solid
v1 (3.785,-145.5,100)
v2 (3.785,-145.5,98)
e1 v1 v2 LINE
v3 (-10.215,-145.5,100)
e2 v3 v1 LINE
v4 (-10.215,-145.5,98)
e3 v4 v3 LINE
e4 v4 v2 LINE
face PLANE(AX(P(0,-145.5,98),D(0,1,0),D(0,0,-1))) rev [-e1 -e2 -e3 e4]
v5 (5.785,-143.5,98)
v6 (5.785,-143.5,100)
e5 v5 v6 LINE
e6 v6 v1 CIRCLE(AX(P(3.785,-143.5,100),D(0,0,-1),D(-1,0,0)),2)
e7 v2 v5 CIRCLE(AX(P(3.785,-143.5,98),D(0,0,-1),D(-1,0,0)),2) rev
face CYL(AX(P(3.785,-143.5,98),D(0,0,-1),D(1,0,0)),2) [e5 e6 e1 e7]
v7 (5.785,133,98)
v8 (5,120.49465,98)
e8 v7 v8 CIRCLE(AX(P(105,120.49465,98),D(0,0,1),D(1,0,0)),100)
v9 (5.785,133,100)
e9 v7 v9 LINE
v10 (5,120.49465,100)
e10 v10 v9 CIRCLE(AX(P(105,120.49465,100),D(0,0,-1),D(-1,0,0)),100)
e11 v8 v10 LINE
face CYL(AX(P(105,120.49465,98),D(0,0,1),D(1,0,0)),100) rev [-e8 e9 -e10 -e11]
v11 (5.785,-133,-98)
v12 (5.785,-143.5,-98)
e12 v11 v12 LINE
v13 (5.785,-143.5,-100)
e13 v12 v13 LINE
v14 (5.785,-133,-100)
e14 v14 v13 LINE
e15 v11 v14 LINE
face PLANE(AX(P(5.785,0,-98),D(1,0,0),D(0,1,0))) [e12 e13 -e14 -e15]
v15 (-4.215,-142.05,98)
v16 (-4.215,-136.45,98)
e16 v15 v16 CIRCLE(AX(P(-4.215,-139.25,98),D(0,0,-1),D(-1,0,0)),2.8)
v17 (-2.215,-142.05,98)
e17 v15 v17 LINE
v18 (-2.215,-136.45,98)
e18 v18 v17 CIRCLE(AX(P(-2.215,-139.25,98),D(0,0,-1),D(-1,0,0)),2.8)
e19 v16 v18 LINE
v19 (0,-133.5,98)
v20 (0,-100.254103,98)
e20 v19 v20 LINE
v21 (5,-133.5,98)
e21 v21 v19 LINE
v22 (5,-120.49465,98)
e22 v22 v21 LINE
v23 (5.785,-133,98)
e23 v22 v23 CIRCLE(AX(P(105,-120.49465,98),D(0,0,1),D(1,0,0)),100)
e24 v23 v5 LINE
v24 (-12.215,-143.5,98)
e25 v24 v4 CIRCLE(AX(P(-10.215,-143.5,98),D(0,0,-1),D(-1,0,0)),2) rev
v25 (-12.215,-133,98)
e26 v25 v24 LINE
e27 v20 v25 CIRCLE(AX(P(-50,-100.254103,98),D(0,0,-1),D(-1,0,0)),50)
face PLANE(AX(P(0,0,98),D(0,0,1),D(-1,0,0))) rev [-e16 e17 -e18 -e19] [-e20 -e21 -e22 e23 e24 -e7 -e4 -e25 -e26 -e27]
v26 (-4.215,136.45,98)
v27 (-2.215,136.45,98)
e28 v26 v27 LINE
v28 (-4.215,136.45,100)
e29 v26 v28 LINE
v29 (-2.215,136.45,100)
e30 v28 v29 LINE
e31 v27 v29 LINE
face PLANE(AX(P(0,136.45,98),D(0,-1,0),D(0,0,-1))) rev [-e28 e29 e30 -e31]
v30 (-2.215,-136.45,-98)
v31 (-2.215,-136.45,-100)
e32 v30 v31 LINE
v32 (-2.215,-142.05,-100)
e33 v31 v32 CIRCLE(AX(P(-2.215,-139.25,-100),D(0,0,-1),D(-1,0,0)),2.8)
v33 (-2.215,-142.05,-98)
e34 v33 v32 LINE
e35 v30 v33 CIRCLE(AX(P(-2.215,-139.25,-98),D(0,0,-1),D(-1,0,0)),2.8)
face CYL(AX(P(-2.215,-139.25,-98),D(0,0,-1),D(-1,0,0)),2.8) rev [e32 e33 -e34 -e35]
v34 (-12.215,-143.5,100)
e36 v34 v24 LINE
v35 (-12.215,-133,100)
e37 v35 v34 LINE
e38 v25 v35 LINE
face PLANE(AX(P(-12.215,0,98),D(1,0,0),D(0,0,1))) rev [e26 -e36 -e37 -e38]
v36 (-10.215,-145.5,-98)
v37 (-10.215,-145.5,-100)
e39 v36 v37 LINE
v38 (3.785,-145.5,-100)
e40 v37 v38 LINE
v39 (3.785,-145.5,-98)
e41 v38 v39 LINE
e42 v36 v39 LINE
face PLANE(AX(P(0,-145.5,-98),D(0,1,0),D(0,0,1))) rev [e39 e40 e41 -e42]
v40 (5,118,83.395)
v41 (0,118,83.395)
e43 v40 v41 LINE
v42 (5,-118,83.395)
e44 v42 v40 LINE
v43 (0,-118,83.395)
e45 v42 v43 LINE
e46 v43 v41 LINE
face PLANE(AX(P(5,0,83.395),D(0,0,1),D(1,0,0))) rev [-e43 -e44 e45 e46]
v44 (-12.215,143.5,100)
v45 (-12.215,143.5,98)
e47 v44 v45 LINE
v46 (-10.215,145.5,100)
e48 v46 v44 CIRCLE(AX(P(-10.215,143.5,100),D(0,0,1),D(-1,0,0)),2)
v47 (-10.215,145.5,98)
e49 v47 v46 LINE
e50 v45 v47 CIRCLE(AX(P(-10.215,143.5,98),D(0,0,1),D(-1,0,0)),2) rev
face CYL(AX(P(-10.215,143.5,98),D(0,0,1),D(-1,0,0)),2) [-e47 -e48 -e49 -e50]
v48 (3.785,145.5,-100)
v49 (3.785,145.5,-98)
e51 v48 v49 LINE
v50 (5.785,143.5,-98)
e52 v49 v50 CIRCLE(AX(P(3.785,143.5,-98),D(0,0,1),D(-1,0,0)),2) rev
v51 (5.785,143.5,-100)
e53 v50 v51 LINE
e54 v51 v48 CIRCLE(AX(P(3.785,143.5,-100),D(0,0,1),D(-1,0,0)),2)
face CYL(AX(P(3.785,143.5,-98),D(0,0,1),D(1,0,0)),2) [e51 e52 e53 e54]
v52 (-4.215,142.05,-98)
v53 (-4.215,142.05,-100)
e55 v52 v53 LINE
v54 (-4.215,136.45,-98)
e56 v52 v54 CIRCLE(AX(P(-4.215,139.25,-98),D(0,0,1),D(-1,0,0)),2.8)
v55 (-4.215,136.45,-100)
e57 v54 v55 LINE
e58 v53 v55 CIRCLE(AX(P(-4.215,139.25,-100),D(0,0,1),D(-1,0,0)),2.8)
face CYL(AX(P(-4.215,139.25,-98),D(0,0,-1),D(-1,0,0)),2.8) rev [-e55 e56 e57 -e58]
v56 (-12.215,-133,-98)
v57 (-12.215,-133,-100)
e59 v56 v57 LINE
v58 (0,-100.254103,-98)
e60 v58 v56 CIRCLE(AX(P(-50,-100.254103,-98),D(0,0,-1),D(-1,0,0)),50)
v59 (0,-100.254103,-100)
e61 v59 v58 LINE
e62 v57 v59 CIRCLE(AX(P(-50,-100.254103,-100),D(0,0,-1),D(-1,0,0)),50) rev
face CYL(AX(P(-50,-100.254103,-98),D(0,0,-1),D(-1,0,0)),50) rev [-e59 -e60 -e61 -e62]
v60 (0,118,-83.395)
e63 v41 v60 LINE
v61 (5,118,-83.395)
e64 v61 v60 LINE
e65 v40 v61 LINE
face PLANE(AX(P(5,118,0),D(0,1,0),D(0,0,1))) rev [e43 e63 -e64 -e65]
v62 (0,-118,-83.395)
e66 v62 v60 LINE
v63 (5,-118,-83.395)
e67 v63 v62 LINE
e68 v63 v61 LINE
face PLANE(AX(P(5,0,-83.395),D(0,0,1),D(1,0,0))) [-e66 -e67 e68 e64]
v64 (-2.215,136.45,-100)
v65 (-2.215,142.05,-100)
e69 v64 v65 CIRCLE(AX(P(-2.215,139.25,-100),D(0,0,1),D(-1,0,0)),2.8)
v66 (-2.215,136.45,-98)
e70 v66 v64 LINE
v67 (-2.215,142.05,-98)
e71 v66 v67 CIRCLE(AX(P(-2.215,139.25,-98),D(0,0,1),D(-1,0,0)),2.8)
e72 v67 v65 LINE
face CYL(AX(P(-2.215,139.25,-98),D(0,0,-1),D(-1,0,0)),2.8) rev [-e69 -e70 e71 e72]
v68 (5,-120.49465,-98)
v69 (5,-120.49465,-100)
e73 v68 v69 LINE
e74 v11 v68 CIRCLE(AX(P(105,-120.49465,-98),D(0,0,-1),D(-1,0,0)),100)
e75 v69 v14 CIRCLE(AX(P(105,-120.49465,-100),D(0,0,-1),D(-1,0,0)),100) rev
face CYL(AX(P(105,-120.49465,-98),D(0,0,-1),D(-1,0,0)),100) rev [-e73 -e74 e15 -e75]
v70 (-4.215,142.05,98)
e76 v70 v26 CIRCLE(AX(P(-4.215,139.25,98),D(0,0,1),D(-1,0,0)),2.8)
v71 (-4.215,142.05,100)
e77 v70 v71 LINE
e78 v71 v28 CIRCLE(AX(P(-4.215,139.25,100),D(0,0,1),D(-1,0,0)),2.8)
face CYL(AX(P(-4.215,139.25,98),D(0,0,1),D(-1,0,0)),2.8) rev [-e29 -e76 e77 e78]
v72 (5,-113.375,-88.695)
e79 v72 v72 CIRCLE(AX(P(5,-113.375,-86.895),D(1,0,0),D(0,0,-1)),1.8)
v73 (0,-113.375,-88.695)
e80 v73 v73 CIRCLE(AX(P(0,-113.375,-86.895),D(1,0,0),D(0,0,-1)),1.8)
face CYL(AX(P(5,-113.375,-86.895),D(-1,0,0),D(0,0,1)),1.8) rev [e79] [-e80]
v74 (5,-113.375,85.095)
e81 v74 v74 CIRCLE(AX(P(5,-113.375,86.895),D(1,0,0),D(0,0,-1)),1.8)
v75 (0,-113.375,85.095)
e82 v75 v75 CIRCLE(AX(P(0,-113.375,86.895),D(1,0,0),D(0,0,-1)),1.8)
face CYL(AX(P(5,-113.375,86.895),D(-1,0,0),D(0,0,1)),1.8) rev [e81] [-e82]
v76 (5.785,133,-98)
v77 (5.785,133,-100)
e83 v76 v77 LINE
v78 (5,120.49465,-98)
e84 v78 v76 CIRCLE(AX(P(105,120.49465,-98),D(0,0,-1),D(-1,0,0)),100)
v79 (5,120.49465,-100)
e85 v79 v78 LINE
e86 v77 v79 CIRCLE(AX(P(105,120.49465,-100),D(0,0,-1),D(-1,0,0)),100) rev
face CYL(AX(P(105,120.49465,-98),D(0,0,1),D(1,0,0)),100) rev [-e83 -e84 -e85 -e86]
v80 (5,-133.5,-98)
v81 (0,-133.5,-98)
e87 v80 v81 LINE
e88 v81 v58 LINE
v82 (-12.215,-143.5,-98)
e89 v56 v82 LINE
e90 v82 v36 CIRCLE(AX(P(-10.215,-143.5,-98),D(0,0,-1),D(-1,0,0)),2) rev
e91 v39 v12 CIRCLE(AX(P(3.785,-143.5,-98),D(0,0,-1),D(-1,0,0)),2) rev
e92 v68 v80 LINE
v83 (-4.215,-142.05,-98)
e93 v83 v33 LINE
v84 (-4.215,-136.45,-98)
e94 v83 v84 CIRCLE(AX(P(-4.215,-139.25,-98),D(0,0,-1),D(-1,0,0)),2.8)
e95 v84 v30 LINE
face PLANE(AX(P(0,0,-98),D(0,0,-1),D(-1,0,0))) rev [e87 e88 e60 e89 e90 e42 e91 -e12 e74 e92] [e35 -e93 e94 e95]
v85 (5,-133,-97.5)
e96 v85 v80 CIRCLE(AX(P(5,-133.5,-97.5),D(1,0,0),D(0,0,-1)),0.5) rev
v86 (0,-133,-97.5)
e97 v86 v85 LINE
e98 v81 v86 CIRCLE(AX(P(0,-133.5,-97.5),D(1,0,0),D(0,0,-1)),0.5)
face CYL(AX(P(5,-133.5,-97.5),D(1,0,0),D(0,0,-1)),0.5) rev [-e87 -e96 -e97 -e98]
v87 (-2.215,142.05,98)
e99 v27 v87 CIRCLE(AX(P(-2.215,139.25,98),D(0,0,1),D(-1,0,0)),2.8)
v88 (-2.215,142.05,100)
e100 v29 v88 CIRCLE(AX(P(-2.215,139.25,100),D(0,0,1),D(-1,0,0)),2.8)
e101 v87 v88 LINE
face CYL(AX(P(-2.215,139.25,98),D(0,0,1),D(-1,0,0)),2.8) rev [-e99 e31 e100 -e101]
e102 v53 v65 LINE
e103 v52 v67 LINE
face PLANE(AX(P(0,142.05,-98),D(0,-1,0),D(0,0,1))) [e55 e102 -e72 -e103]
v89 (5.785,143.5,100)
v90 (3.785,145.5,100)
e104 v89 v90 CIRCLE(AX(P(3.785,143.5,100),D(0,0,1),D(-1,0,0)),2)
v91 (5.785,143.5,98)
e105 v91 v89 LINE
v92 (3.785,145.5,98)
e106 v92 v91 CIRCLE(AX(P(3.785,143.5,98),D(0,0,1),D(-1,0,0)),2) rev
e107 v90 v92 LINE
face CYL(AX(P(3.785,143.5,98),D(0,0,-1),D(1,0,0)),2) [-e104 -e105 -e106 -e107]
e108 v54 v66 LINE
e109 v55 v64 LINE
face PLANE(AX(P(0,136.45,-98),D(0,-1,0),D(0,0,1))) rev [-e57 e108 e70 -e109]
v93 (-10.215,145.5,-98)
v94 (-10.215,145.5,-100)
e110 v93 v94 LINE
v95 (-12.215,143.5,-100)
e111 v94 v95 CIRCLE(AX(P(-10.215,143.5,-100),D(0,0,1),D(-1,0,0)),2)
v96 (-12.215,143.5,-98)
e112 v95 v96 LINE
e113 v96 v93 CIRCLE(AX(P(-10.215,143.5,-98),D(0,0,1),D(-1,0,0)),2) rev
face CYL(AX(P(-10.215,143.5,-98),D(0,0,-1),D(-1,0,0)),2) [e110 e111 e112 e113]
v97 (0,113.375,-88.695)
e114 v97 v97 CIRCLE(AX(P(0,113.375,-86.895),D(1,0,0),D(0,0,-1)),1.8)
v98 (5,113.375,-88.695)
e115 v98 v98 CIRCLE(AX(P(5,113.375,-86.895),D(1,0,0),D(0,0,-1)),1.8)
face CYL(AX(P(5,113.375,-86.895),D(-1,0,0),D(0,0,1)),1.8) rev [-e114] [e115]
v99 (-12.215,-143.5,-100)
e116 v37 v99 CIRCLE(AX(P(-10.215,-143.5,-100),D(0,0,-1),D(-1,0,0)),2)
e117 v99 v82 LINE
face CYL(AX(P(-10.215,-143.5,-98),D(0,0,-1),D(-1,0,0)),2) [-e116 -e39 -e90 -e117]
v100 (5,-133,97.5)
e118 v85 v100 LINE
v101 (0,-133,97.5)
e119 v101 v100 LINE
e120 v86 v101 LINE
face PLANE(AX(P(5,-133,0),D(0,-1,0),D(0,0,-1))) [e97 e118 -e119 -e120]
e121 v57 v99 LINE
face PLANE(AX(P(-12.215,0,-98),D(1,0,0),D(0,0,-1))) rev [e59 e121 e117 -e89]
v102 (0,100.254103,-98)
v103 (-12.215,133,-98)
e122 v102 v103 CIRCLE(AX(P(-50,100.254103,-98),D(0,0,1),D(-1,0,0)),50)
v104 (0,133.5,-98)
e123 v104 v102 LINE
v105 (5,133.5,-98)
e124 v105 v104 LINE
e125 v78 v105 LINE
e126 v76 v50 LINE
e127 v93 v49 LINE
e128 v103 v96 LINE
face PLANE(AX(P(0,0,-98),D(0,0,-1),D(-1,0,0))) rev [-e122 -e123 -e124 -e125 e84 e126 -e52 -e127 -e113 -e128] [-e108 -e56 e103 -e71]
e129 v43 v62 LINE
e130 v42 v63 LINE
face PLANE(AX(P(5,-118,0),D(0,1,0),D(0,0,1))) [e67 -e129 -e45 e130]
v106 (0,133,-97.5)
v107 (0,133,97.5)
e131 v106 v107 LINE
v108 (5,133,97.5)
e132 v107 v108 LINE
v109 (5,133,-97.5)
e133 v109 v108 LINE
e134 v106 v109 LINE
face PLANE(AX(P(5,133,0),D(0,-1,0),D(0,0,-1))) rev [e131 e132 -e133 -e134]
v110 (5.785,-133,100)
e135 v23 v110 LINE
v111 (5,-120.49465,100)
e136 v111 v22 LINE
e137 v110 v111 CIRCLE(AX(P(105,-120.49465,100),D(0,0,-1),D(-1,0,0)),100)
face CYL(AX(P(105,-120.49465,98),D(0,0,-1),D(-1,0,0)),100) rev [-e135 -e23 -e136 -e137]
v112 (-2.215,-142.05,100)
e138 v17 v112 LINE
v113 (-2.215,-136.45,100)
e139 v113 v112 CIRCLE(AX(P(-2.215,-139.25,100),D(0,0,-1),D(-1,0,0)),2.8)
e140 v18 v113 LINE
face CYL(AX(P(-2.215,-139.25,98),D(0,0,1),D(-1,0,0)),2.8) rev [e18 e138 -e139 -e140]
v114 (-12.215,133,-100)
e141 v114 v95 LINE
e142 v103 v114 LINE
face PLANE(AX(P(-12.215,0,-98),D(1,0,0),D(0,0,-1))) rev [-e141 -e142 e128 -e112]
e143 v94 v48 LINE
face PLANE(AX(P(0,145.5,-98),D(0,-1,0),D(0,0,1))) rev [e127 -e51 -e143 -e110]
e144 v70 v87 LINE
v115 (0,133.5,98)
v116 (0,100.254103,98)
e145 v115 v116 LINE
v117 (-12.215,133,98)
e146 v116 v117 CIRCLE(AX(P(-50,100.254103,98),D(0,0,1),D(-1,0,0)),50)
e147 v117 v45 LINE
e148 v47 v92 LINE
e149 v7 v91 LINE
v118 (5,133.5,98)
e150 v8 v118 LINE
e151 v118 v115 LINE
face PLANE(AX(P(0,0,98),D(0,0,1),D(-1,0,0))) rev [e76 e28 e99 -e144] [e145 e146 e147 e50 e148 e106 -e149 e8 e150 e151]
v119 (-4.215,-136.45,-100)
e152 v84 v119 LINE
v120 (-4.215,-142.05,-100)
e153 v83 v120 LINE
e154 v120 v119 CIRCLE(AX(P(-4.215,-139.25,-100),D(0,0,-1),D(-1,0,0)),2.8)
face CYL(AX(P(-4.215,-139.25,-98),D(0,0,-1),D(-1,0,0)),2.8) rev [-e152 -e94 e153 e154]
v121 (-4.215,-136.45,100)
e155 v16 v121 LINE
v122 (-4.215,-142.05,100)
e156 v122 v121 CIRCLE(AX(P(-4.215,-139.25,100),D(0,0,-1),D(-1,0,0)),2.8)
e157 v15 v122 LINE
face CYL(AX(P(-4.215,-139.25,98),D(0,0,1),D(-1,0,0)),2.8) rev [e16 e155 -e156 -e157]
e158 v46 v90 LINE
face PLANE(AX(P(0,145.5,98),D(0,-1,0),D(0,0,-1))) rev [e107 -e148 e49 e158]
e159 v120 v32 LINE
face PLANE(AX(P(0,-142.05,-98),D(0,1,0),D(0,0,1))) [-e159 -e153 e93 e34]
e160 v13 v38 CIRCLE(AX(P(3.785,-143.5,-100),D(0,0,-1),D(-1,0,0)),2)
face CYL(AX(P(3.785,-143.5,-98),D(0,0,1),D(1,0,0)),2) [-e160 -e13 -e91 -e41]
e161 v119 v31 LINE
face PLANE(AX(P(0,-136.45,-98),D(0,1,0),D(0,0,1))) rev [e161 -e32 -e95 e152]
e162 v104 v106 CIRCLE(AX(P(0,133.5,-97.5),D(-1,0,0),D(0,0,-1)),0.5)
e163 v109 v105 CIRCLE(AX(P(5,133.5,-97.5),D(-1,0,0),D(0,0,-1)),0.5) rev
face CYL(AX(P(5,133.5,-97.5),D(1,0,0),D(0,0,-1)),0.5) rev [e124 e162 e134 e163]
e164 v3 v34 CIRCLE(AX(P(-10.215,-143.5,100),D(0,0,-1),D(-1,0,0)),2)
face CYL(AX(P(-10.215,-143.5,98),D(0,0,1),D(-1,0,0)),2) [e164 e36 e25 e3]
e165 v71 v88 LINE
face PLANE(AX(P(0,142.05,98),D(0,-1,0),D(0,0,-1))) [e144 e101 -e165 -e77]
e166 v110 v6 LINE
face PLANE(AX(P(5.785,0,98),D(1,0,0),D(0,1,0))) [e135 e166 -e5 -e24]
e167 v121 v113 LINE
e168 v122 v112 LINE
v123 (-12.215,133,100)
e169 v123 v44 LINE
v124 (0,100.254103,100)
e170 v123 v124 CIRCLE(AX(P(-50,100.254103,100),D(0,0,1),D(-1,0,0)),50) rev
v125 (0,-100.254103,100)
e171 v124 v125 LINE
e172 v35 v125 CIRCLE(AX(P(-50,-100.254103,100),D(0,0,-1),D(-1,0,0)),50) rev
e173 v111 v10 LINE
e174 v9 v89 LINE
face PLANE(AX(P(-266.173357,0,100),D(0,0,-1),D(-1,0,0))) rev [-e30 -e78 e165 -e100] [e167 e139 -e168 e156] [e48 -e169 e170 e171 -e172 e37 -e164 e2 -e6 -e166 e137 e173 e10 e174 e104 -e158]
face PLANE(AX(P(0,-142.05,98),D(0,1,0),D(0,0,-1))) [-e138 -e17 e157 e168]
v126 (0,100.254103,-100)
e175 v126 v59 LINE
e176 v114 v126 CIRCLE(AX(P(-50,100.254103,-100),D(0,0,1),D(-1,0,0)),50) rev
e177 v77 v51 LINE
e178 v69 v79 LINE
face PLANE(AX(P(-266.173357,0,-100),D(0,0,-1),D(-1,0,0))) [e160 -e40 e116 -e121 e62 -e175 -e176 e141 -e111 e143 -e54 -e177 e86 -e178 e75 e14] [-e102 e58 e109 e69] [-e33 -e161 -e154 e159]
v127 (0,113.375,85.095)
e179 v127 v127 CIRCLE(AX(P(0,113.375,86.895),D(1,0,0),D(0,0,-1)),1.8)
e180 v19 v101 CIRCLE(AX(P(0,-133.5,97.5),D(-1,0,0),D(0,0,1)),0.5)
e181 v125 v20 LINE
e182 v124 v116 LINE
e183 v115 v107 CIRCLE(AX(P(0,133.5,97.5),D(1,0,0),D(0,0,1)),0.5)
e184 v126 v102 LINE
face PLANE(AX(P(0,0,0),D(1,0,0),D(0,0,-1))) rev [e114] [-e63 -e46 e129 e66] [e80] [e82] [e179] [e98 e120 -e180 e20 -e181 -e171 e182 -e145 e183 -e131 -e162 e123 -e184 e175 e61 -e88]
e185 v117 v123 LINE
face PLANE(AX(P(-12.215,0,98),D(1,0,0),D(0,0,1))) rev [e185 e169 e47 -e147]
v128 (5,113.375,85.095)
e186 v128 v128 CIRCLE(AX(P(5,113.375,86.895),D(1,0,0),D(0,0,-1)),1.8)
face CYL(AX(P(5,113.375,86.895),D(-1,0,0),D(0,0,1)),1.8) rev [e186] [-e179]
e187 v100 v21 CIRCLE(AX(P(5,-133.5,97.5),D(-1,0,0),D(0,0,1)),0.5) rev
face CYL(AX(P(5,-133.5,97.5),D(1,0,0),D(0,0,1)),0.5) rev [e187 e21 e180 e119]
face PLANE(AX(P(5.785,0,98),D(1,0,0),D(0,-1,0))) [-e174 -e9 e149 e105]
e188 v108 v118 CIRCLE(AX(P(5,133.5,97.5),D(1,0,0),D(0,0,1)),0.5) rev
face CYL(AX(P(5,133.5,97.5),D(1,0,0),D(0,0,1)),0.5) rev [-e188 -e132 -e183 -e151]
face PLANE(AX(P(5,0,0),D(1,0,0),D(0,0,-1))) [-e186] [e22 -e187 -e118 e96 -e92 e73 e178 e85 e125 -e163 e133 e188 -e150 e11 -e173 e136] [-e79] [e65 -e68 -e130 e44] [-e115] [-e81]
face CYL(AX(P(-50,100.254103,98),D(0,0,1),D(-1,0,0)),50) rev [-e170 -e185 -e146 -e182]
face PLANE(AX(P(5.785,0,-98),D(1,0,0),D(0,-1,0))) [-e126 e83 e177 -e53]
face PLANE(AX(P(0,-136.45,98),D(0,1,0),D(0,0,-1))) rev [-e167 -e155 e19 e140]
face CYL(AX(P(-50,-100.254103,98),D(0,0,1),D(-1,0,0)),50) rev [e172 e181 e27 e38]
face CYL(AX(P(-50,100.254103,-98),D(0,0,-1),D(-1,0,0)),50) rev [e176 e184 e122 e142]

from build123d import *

# Parameters (mm, degrees)
SKETCH1_W           = 266
SKETCH1_H           = 7
SKETCH1_R           = 1.8
SKETCH1_W_2         = 15
SKETCH1_H_2         = 166.79
BOSS_EXTRUDE1_DEPTH = 5
SKETCH2_W           = 266
SKETCH2_H           = 9.605
BOSS_EXTRUDE2_DEPTH = 5
SKETCH3_W           = 17.215
SKETCH3_H           = 12.5
SKETCH3_W_2         = 0.785
BOSS_EXTRUDE3_DEPTH = 2
FILLET1_R           = 0.5
FILLET2_R           = 50
FILLET3_R           = 2
FILLET4_R           = 100


with BuildPart() as part:
    # Sketch1 → Boss-Extrude1 (new body)
    # profile 1 of 4: a face of its own
    with BuildSketch(Plane.YZ):
        with Locations((0, 86.895)):
            Rectangle(SKETCH1_W, SKETCH1_H)
        with Locations(Location((113.375, 86.895, 0), (0, 0, 270))):
            Circle(SKETCH1_R, mode=Mode.SUBTRACT)
        with Locations(Location((-113.375, 86.895, 0), (0, 0, 270))):
            Circle(SKETCH1_R, mode=Mode.SUBTRACT)
    # profile 2 of 4: a face of its own
    with BuildSketch(Plane.YZ):
        with Locations((125.5, 0)):
            Rectangle(SKETCH1_W_2, SKETCH1_H_2)
    # profile 3 of 4: a face of its own
    with BuildSketch(Plane.YZ):
        with Locations((-125.5, 0)):
            Rectangle(SKETCH1_W_2, SKETCH1_H_2)
    # profile 4 of 4: a face of its own
    with BuildSketch(Plane.YZ):
        with Locations((0, -86.895)):
            Rectangle(SKETCH1_W, SKETCH1_H)
        with Locations(Location((-113.375, -86.895, 0), (0, 0, 270))):
            Circle(SKETCH1_R, mode=Mode.SUBTRACT)
        with Locations(Location((113.375, -86.895, 0), (0, 0, 270))):
            Circle(SKETCH1_R, mode=Mode.SUBTRACT)
    extrude(amount=BOSS_EXTRUDE1_DEPTH)

    # Sketch2 → Boss-Extrude2 (add)
    with BuildSketch(Plane.YZ.offset(5)):
        with Locations((0, 95.1975)):
            Rectangle(SKETCH2_W, SKETCH2_H)
        with Locations((0, -95.1975)):
            Rectangle(SKETCH2_W, SKETCH2_H)
    extrude(amount=-BOSS_EXTRUDE2_DEPTH)

    # Sketch3 → Boss-Extrude3 (add)
    # profile 1 of 2: a face of its own
    with BuildSketch(Plane(origin=(0, 0, -100), x_dir=(1, 0, 0), z_dir=(0, 0, -1))):
        with Locations((-3.6075, 139.25)):
            Rectangle(SKETCH3_W, SKETCH3_H)
        with BuildLine():
            ThreePointArc((-4.215, 136.45), (-7.015, 139.25), (-4.215, 142.05))
            Line((-4.215, 142.05), (-2.215, 142.05))
            ThreePointArc((-2.215, 142.05), (0.585, 139.25), (-2.215, 136.45))
            Line((-2.215, 136.45), (-4.215, 136.45))
        make_face(mode=Mode.SUBTRACT)
    # profile 2 of 2: a face of its own
    with BuildSketch(Plane(origin=(0, 0, -100), x_dir=(1, 0, 0), z_dir=(0, 0, -1))):
        with Locations((5.3925, 139.25)):
            Rectangle(SKETCH3_W_2, SKETCH3_H)
    extrude(amount=-BOSS_EXTRUDE3_DEPTH)

    # Fillet1
    fillet1_edges = [part.edges().sort_by_distance(p)[0] for p in [
        (2.5, -133, -98),
    ]]
    fillet(fillet1_edges, radius=FILLET1_R)

    # Fillet2
    # the kernel refuses this fillet: 50 mm, written as the material it adds along each edge
    with BuildSketch(Plane(origin=(0, -133, -100), x_dir=(0, 1, 0), z_dir=(0, 0, 1))) as fillet2_piece_1:
        with BuildLine():
            CenterArc((32.745897071, 50), FILLET2_R, 229.086571868, 40.913428132)
            Line((0, 12.215), (0, 0))
            Line((0, 0), (32.745897071, 0))
        make_face()
    extrude(amount=2)

    # Fillet3
    fillet3_edges = [part.edges().sort_by_distance(p)[0] for p in [
        (-12.215, -145.5, -99),
        (5.785, -145.5, -99),
    ]]
    fillet(fillet3_edges, radius=FILLET3_R)

    # Mirror1: part across plane


with BuildPart() as part_1:
    add(part.part)
    add(part.part.mirror(Plane.XY))

    # Mirror2: part across plane


with BuildPart() as part_2:
    add(part_1.part)
    add(part_1.part.mirror(Plane.ZX))

    # Fillet4
    # the kernel refuses this fillet: 100 mm, written as the material it adds along each edge
    with BuildSketch(Plane(origin=(5, 133, 98), x_dir=(1, 0, 0), z_dir=(0, 0, 1)), Plane(origin=(5, 133, -100), x_dir=(1, 0, 0), z_dir=(0, 0, 1)), Plane(origin=(5, -133, -98), x_dir=(1, 0, 0), z_dir=(0, 0, -1)), Plane(origin=(5, -133, 100), x_dir=(1, 0, 0), z_dir=(0, 0, -1))) as fillet4_piece_1:
        with BuildLine():
            CenterArc((100, -12.505349855), FILLET4_R, 172.816154735, 7.183845265)
            Line((0, -12.505349855), (0, 0))
            Line((0, 0), (0.785, 0))
        make_face()
    extrude(amount=2)


solid = part_2.part
